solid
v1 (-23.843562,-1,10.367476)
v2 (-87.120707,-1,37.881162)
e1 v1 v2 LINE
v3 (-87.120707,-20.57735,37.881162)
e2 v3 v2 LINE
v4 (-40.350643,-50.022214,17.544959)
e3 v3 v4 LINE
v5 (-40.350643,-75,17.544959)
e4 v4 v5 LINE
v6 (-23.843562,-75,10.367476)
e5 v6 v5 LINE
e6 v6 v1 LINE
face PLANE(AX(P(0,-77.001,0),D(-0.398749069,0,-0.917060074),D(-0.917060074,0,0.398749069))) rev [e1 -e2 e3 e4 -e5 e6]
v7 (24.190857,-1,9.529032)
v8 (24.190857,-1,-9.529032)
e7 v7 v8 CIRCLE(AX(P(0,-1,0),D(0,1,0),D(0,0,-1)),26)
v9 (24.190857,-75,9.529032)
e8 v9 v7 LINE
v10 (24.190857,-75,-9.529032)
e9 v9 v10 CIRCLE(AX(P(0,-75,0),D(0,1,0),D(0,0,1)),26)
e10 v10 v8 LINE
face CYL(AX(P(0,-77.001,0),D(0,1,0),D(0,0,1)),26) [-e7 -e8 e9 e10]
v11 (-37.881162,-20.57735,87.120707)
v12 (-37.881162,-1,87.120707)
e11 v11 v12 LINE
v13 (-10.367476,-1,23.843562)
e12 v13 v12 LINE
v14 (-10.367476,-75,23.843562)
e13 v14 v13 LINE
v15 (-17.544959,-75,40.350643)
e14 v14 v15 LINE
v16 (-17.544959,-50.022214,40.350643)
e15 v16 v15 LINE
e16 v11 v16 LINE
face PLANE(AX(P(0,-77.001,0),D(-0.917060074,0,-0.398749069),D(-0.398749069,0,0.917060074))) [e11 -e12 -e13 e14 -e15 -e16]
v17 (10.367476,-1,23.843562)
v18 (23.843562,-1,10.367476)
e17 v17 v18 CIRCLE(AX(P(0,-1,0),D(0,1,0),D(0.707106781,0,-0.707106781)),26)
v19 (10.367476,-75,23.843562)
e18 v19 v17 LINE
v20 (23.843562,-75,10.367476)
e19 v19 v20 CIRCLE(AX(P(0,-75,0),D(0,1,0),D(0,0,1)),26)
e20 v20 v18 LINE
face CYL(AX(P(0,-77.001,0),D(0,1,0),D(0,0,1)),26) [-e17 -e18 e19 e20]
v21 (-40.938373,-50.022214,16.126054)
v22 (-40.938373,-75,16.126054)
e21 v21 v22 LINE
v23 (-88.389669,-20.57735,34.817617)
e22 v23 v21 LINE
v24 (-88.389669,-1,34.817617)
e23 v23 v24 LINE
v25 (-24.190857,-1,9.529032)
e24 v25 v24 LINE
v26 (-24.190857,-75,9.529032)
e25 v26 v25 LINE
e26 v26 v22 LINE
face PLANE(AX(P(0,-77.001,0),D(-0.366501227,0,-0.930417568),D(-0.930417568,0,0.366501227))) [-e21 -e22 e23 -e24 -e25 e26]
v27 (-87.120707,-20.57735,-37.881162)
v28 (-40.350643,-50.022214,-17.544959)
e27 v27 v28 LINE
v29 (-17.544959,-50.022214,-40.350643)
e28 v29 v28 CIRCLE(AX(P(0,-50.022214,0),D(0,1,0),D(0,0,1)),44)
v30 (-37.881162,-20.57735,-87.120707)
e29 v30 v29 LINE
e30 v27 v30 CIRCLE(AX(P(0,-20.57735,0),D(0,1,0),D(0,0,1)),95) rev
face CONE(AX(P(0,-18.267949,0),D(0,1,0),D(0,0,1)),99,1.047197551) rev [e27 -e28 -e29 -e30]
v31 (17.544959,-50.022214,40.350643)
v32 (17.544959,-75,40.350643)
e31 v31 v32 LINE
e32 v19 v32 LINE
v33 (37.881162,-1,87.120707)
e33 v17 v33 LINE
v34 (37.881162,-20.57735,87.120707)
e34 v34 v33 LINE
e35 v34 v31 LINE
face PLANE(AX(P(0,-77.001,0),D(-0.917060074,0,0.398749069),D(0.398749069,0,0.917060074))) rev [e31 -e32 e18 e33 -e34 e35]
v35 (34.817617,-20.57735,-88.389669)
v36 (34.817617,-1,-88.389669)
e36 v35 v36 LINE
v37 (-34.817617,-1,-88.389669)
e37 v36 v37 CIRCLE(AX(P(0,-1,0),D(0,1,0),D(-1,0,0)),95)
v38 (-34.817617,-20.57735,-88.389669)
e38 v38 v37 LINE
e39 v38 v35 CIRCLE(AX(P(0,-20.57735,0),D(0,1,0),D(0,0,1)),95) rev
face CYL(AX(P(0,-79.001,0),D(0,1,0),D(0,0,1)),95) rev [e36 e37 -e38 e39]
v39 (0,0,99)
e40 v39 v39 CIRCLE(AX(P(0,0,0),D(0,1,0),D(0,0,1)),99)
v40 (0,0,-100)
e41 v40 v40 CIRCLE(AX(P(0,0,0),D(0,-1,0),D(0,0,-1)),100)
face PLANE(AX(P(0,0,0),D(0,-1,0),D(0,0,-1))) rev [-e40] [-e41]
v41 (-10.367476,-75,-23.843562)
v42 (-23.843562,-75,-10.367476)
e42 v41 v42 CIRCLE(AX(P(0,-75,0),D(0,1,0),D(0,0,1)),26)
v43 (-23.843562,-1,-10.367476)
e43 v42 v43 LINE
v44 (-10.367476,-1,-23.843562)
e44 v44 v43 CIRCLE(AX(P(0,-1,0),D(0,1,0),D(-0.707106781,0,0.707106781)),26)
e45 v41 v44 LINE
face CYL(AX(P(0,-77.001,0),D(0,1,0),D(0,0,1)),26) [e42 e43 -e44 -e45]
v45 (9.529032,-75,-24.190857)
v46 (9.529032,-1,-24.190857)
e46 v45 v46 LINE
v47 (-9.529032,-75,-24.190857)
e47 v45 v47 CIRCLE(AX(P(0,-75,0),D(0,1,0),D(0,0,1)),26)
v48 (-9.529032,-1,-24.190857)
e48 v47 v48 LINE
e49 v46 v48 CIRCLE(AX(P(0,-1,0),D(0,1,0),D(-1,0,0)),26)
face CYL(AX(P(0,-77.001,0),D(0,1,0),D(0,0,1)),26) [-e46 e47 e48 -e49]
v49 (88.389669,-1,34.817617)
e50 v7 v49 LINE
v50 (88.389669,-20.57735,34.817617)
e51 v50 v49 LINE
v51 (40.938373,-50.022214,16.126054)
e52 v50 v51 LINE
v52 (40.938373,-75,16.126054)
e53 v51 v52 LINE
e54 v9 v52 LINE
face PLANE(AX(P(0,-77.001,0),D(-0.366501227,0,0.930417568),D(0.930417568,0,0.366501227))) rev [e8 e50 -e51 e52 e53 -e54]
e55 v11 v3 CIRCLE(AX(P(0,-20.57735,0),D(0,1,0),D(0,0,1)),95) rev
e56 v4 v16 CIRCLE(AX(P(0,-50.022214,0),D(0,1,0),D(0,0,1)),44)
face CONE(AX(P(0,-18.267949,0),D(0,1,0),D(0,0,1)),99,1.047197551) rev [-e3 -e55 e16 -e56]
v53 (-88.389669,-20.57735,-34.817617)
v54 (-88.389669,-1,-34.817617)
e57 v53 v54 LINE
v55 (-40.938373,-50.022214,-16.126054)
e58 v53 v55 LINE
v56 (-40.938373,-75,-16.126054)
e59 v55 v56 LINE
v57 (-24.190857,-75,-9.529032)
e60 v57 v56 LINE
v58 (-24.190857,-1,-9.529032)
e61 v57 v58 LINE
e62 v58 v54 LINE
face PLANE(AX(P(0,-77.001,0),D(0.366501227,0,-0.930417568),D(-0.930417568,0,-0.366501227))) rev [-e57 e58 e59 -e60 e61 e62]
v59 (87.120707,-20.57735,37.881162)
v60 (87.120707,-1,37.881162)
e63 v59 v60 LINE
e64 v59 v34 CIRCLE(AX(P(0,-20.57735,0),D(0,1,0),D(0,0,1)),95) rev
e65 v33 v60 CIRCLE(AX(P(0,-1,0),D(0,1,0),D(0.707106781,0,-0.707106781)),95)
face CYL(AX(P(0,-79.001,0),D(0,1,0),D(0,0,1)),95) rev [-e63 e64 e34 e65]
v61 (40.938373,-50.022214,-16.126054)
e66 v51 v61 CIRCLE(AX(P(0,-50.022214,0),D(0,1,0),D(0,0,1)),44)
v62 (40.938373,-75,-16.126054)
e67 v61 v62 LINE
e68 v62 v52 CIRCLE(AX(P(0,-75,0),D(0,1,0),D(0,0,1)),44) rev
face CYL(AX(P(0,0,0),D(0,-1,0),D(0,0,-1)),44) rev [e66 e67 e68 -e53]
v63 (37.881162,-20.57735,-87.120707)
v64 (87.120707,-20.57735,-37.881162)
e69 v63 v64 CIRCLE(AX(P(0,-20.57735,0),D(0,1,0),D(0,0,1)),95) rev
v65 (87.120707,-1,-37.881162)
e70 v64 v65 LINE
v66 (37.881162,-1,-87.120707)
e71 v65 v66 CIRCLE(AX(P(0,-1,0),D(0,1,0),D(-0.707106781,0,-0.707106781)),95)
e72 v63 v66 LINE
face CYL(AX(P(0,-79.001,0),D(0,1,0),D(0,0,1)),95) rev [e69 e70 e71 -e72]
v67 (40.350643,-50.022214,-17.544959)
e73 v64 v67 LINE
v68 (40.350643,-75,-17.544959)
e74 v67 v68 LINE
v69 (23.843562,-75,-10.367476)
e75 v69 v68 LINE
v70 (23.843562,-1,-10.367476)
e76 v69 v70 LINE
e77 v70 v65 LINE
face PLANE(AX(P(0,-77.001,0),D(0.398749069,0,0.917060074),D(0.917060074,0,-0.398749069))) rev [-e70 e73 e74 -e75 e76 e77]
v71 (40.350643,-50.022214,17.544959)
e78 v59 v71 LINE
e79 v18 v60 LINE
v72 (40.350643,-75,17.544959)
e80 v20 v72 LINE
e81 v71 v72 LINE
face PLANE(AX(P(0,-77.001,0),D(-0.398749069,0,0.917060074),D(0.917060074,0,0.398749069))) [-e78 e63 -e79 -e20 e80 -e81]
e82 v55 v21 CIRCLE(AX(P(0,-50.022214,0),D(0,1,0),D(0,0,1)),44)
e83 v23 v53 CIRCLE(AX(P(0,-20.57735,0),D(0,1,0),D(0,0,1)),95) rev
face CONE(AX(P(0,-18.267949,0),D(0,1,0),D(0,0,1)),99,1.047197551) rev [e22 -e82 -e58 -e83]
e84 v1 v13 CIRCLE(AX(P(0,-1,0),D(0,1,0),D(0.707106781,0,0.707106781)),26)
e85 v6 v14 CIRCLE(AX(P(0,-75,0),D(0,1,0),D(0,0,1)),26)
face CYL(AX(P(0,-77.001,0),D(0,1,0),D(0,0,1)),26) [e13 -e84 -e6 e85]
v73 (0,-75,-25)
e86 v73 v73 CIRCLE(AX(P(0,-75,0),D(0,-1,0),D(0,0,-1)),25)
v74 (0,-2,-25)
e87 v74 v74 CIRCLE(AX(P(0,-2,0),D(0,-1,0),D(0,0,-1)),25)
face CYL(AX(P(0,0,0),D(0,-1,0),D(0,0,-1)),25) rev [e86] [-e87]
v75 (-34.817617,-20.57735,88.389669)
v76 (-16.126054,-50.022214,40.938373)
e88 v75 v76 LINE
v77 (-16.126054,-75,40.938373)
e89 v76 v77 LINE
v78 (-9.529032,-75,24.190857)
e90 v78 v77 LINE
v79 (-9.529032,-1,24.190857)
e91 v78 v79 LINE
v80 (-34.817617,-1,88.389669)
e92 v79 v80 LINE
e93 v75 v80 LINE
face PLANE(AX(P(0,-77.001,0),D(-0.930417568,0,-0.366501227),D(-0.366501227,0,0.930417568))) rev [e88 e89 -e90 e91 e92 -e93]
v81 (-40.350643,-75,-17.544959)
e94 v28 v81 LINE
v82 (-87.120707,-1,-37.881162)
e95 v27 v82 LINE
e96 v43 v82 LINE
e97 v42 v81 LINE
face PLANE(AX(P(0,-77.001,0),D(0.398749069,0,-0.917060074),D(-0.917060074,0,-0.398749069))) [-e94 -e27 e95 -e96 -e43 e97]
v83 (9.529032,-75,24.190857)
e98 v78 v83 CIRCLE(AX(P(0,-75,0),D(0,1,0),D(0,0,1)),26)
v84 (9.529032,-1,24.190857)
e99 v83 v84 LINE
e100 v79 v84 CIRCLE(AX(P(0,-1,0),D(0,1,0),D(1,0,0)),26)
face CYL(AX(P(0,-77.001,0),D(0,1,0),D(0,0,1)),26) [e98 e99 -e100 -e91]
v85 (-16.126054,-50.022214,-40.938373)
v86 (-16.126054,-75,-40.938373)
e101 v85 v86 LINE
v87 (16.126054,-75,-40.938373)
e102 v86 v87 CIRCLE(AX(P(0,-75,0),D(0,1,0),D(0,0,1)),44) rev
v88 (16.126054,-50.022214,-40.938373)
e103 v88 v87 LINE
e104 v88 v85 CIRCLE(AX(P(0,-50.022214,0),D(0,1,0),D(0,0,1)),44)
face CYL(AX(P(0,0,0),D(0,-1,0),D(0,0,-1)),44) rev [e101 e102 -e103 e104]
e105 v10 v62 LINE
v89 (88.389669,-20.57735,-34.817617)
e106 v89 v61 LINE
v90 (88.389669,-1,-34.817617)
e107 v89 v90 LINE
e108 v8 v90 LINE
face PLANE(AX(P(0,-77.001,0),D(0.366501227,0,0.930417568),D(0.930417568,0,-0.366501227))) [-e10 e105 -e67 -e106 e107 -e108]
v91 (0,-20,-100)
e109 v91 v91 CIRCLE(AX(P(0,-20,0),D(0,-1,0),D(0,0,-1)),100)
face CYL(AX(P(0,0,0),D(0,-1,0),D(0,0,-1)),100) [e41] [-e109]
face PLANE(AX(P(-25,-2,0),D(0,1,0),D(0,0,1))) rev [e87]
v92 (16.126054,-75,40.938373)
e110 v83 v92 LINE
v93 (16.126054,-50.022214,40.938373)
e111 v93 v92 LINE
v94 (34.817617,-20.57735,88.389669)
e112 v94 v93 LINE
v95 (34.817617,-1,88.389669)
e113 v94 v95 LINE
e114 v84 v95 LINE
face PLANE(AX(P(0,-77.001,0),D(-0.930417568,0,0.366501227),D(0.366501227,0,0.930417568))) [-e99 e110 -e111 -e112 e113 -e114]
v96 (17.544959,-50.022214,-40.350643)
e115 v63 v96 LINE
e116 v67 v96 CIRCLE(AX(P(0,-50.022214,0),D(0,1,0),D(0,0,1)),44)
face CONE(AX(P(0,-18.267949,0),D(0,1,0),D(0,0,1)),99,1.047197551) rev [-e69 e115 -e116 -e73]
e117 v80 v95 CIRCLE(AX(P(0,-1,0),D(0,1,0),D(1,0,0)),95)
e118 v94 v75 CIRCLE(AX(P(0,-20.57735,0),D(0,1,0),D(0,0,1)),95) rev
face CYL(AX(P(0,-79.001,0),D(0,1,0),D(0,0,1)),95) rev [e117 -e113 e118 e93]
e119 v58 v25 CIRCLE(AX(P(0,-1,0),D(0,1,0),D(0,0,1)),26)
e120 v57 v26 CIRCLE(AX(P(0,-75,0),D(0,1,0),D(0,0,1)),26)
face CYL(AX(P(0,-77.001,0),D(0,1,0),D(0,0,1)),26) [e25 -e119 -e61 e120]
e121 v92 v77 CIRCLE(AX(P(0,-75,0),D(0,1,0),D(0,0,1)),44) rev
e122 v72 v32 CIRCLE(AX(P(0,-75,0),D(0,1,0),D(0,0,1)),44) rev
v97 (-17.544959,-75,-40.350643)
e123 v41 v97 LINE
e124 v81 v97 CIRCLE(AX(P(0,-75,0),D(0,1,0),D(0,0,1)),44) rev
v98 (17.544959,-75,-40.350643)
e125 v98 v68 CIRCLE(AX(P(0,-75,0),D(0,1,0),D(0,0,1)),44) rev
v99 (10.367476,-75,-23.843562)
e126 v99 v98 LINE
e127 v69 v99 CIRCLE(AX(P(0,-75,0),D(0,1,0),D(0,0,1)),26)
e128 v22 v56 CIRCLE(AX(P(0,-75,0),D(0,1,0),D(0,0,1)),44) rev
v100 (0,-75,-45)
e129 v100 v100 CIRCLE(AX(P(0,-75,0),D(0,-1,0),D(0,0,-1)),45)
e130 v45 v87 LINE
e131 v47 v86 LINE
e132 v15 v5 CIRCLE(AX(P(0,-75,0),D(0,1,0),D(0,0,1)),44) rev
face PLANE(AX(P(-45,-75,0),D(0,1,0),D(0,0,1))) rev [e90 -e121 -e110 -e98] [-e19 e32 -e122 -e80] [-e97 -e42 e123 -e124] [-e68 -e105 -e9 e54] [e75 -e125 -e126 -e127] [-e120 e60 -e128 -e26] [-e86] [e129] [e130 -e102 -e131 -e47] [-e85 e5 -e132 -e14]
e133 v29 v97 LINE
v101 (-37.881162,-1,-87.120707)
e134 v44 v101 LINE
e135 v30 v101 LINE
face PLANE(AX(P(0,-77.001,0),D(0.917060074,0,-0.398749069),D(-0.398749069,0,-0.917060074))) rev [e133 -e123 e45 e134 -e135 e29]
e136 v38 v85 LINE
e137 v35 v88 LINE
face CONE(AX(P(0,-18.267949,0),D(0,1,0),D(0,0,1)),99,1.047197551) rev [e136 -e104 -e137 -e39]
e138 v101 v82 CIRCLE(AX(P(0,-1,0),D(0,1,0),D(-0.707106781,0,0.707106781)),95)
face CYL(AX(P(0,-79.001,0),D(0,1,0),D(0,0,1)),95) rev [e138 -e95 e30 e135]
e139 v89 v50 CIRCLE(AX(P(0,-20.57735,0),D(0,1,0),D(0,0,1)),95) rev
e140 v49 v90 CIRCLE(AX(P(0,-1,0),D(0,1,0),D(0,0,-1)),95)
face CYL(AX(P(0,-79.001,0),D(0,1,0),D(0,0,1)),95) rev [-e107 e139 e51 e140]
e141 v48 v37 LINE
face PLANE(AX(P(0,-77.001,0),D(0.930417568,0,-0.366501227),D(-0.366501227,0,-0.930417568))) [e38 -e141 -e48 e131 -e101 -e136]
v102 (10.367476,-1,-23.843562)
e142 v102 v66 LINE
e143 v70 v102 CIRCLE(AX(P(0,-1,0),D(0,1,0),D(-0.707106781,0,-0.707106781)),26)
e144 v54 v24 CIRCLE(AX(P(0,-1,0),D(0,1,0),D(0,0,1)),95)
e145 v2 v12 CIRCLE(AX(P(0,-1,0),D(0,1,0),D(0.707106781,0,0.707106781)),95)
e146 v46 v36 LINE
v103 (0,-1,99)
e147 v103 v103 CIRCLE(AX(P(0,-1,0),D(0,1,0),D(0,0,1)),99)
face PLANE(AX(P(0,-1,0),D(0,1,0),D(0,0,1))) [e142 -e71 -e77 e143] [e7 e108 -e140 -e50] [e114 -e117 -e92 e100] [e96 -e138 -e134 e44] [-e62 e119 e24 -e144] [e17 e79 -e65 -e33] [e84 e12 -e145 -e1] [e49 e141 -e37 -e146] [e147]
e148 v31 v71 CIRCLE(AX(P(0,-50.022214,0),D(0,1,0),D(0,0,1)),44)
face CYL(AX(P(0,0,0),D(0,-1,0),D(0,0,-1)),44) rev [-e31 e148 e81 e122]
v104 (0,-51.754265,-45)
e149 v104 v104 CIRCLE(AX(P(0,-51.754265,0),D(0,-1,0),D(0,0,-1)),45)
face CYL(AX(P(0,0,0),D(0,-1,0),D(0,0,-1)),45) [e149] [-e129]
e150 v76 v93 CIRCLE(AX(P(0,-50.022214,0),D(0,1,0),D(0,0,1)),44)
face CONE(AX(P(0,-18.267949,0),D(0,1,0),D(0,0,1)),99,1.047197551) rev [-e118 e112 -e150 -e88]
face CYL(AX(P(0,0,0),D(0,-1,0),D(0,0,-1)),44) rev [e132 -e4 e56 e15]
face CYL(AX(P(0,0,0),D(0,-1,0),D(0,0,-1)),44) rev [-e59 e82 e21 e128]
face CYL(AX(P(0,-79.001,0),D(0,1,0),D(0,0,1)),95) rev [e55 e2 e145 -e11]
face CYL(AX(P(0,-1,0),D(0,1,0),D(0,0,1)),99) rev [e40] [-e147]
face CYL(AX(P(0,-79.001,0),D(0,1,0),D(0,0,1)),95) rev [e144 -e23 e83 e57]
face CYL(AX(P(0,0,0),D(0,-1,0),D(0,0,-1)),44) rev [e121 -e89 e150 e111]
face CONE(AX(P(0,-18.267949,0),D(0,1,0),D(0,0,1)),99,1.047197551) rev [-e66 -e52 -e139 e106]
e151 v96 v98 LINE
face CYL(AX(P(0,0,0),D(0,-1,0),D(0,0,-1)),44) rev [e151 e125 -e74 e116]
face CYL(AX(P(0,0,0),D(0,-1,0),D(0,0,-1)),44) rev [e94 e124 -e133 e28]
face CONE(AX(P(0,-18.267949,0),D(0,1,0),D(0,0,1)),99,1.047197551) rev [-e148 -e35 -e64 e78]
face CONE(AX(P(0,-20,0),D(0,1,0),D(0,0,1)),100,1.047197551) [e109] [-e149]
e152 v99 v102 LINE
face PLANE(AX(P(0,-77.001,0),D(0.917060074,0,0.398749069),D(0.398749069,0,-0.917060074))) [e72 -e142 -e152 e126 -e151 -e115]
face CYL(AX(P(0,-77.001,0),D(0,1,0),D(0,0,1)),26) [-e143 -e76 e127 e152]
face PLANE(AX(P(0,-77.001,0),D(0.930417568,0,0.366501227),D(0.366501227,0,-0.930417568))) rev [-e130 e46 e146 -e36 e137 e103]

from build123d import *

# Parameters (mm, degrees)
SKETCH4_R          = 99
CUT_EXTRUDE1_DEPTH = 1
CUT_EXTRUDE2_START = -74
CUT_EXTRUDE2_DEPTH = 74
CUT_EXTRUDE3_REACH = 161.612
CIRPATTERN1_COUNT  = 8


# Read off the part's stored shape, not the designer's step: Cut-Extrude2
with BuildPart() as part:
    # Sketch1 → Revolve1 (revolve)
    with BuildSketch(Plane.XY, mode=Mode.PRIVATE) as revolve1_sk:
        Polygon((0, 0), (-100, 0), (-100, -20), (-45, -51.754264805), (-45, -75), (-25, -75), (-25, -2), (0, -2), align=None)
    revolve(revolve1_sk.sketch.rotate(Axis((0, 0, 0), (0, 1, 0)), 270), axis=Axis((0, 0, 0), (0, 1, 0)))

    # Sketch4 → Cut-Extrude1 (cut)
    with BuildSketch(Plane(origin=(0, 0, 0), x_dir=(1, 0, 0), z_dir=(0, 1, 0))):
        with Locations(Location((0, 0, 0), (0, 0, 270))):
            Circle(SKETCH4_R)
    extrude(amount=-CUT_EXTRUDE1_DEPTH, mode=Mode.SUBTRACT)

    # Cut-Extrude2 outline → Cut-Extrude2 (cut)
    with BuildSketch(Plane(origin=(0, -1, 0), x_dir=(1, 0, 0), z_dir=(0, 1, 0)).offset(CUT_EXTRUDE2_START)):
        with BuildLine():
            ThreePointArc((-24.190856768, -9.529031895), (-26, 0), (-24.190856768, 9.529031895))
            Line((-24.190856768, 9.529031895), (-40.938372991, 16.126053976))
            ThreePointArc((-40.938372991, 16.126053976), (-44, 0), (-40.938372991, -16.126053976))
            Line((-40.938372991, -16.126053976), (-24.190856768, -9.529031895))
        make_face()
    cut_extrude2 = extrude(amount=CUT_EXTRUDE2_DEPTH, mode=Mode.SUBTRACT)

    # Cut-Extrude3: up to this cone (the profile starts inside it)
    cut_extrude3_end = Plane(origin=(0, -1, 0), z_dir=(0, 1, 0)).offset(-74.425624842) * Cone(1.732e-06, 632.972063387, 365.446590186, align=(Align.CENTER, Align.CENTER, Align.MIN), mode=Mode.PRIVATE)
    # Sketch5<4> → Cut-Extrude3 (cut, up to the surface)
    with BuildSketch(Plane(origin=(0, -1, 0), x_dir=(1, 0, 0), z_dir=(0, 1, 0)), mode=Mode.PRIVATE) as cut_extrude3_sk1:
        with BuildLine():
            Line((-88.389668958, -34.817616539), (-24.190856768, -9.529031895))
            ThreePointArc((-24.190856768, -9.529031895), (-26, 0), (-24.190856768, 9.529031895))
            Line((-24.190856768, 9.529031895), (-88.389668958, 34.817616539))
            ThreePointArc((-88.389668958, 34.817616539), (-95, 0), (-88.389668958, -34.817616539))
        make_face()
    cut_extrude3_tool1 = extrude(cut_extrude3_sk1.sketch, amount=-CUT_EXTRUDE3_REACH, mode=Mode.PRIVATE) & cut_extrude3_end
    cut_extrude3 = cut_extrude3_tool1.solids().sort_by_distance((-65.495165, -1, 0))[0]
    add(cut_extrude3, mode=Mode.SUBTRACT)

    # CirPattern1: Cut-Extrude2, Cut-Extrude3 ×8 about axis
    cirpattern1_axis = Axis((0, 0, 0), (0, 1, 0))
    add([cut_extrude2.rotate(cirpattern1_axis, i * 360 / CIRPATTERN1_COUNT) for i in range(1, CIRPATTERN1_COUNT)], mode=Mode.SUBTRACT)
    add([cut_extrude3.rotate(cirpattern1_axis, i * 360 / CIRPATTERN1_COUNT) for i in range(1, CIRPATTERN1_COUNT)], mode=Mode.SUBTRACT)


solid = part.part
